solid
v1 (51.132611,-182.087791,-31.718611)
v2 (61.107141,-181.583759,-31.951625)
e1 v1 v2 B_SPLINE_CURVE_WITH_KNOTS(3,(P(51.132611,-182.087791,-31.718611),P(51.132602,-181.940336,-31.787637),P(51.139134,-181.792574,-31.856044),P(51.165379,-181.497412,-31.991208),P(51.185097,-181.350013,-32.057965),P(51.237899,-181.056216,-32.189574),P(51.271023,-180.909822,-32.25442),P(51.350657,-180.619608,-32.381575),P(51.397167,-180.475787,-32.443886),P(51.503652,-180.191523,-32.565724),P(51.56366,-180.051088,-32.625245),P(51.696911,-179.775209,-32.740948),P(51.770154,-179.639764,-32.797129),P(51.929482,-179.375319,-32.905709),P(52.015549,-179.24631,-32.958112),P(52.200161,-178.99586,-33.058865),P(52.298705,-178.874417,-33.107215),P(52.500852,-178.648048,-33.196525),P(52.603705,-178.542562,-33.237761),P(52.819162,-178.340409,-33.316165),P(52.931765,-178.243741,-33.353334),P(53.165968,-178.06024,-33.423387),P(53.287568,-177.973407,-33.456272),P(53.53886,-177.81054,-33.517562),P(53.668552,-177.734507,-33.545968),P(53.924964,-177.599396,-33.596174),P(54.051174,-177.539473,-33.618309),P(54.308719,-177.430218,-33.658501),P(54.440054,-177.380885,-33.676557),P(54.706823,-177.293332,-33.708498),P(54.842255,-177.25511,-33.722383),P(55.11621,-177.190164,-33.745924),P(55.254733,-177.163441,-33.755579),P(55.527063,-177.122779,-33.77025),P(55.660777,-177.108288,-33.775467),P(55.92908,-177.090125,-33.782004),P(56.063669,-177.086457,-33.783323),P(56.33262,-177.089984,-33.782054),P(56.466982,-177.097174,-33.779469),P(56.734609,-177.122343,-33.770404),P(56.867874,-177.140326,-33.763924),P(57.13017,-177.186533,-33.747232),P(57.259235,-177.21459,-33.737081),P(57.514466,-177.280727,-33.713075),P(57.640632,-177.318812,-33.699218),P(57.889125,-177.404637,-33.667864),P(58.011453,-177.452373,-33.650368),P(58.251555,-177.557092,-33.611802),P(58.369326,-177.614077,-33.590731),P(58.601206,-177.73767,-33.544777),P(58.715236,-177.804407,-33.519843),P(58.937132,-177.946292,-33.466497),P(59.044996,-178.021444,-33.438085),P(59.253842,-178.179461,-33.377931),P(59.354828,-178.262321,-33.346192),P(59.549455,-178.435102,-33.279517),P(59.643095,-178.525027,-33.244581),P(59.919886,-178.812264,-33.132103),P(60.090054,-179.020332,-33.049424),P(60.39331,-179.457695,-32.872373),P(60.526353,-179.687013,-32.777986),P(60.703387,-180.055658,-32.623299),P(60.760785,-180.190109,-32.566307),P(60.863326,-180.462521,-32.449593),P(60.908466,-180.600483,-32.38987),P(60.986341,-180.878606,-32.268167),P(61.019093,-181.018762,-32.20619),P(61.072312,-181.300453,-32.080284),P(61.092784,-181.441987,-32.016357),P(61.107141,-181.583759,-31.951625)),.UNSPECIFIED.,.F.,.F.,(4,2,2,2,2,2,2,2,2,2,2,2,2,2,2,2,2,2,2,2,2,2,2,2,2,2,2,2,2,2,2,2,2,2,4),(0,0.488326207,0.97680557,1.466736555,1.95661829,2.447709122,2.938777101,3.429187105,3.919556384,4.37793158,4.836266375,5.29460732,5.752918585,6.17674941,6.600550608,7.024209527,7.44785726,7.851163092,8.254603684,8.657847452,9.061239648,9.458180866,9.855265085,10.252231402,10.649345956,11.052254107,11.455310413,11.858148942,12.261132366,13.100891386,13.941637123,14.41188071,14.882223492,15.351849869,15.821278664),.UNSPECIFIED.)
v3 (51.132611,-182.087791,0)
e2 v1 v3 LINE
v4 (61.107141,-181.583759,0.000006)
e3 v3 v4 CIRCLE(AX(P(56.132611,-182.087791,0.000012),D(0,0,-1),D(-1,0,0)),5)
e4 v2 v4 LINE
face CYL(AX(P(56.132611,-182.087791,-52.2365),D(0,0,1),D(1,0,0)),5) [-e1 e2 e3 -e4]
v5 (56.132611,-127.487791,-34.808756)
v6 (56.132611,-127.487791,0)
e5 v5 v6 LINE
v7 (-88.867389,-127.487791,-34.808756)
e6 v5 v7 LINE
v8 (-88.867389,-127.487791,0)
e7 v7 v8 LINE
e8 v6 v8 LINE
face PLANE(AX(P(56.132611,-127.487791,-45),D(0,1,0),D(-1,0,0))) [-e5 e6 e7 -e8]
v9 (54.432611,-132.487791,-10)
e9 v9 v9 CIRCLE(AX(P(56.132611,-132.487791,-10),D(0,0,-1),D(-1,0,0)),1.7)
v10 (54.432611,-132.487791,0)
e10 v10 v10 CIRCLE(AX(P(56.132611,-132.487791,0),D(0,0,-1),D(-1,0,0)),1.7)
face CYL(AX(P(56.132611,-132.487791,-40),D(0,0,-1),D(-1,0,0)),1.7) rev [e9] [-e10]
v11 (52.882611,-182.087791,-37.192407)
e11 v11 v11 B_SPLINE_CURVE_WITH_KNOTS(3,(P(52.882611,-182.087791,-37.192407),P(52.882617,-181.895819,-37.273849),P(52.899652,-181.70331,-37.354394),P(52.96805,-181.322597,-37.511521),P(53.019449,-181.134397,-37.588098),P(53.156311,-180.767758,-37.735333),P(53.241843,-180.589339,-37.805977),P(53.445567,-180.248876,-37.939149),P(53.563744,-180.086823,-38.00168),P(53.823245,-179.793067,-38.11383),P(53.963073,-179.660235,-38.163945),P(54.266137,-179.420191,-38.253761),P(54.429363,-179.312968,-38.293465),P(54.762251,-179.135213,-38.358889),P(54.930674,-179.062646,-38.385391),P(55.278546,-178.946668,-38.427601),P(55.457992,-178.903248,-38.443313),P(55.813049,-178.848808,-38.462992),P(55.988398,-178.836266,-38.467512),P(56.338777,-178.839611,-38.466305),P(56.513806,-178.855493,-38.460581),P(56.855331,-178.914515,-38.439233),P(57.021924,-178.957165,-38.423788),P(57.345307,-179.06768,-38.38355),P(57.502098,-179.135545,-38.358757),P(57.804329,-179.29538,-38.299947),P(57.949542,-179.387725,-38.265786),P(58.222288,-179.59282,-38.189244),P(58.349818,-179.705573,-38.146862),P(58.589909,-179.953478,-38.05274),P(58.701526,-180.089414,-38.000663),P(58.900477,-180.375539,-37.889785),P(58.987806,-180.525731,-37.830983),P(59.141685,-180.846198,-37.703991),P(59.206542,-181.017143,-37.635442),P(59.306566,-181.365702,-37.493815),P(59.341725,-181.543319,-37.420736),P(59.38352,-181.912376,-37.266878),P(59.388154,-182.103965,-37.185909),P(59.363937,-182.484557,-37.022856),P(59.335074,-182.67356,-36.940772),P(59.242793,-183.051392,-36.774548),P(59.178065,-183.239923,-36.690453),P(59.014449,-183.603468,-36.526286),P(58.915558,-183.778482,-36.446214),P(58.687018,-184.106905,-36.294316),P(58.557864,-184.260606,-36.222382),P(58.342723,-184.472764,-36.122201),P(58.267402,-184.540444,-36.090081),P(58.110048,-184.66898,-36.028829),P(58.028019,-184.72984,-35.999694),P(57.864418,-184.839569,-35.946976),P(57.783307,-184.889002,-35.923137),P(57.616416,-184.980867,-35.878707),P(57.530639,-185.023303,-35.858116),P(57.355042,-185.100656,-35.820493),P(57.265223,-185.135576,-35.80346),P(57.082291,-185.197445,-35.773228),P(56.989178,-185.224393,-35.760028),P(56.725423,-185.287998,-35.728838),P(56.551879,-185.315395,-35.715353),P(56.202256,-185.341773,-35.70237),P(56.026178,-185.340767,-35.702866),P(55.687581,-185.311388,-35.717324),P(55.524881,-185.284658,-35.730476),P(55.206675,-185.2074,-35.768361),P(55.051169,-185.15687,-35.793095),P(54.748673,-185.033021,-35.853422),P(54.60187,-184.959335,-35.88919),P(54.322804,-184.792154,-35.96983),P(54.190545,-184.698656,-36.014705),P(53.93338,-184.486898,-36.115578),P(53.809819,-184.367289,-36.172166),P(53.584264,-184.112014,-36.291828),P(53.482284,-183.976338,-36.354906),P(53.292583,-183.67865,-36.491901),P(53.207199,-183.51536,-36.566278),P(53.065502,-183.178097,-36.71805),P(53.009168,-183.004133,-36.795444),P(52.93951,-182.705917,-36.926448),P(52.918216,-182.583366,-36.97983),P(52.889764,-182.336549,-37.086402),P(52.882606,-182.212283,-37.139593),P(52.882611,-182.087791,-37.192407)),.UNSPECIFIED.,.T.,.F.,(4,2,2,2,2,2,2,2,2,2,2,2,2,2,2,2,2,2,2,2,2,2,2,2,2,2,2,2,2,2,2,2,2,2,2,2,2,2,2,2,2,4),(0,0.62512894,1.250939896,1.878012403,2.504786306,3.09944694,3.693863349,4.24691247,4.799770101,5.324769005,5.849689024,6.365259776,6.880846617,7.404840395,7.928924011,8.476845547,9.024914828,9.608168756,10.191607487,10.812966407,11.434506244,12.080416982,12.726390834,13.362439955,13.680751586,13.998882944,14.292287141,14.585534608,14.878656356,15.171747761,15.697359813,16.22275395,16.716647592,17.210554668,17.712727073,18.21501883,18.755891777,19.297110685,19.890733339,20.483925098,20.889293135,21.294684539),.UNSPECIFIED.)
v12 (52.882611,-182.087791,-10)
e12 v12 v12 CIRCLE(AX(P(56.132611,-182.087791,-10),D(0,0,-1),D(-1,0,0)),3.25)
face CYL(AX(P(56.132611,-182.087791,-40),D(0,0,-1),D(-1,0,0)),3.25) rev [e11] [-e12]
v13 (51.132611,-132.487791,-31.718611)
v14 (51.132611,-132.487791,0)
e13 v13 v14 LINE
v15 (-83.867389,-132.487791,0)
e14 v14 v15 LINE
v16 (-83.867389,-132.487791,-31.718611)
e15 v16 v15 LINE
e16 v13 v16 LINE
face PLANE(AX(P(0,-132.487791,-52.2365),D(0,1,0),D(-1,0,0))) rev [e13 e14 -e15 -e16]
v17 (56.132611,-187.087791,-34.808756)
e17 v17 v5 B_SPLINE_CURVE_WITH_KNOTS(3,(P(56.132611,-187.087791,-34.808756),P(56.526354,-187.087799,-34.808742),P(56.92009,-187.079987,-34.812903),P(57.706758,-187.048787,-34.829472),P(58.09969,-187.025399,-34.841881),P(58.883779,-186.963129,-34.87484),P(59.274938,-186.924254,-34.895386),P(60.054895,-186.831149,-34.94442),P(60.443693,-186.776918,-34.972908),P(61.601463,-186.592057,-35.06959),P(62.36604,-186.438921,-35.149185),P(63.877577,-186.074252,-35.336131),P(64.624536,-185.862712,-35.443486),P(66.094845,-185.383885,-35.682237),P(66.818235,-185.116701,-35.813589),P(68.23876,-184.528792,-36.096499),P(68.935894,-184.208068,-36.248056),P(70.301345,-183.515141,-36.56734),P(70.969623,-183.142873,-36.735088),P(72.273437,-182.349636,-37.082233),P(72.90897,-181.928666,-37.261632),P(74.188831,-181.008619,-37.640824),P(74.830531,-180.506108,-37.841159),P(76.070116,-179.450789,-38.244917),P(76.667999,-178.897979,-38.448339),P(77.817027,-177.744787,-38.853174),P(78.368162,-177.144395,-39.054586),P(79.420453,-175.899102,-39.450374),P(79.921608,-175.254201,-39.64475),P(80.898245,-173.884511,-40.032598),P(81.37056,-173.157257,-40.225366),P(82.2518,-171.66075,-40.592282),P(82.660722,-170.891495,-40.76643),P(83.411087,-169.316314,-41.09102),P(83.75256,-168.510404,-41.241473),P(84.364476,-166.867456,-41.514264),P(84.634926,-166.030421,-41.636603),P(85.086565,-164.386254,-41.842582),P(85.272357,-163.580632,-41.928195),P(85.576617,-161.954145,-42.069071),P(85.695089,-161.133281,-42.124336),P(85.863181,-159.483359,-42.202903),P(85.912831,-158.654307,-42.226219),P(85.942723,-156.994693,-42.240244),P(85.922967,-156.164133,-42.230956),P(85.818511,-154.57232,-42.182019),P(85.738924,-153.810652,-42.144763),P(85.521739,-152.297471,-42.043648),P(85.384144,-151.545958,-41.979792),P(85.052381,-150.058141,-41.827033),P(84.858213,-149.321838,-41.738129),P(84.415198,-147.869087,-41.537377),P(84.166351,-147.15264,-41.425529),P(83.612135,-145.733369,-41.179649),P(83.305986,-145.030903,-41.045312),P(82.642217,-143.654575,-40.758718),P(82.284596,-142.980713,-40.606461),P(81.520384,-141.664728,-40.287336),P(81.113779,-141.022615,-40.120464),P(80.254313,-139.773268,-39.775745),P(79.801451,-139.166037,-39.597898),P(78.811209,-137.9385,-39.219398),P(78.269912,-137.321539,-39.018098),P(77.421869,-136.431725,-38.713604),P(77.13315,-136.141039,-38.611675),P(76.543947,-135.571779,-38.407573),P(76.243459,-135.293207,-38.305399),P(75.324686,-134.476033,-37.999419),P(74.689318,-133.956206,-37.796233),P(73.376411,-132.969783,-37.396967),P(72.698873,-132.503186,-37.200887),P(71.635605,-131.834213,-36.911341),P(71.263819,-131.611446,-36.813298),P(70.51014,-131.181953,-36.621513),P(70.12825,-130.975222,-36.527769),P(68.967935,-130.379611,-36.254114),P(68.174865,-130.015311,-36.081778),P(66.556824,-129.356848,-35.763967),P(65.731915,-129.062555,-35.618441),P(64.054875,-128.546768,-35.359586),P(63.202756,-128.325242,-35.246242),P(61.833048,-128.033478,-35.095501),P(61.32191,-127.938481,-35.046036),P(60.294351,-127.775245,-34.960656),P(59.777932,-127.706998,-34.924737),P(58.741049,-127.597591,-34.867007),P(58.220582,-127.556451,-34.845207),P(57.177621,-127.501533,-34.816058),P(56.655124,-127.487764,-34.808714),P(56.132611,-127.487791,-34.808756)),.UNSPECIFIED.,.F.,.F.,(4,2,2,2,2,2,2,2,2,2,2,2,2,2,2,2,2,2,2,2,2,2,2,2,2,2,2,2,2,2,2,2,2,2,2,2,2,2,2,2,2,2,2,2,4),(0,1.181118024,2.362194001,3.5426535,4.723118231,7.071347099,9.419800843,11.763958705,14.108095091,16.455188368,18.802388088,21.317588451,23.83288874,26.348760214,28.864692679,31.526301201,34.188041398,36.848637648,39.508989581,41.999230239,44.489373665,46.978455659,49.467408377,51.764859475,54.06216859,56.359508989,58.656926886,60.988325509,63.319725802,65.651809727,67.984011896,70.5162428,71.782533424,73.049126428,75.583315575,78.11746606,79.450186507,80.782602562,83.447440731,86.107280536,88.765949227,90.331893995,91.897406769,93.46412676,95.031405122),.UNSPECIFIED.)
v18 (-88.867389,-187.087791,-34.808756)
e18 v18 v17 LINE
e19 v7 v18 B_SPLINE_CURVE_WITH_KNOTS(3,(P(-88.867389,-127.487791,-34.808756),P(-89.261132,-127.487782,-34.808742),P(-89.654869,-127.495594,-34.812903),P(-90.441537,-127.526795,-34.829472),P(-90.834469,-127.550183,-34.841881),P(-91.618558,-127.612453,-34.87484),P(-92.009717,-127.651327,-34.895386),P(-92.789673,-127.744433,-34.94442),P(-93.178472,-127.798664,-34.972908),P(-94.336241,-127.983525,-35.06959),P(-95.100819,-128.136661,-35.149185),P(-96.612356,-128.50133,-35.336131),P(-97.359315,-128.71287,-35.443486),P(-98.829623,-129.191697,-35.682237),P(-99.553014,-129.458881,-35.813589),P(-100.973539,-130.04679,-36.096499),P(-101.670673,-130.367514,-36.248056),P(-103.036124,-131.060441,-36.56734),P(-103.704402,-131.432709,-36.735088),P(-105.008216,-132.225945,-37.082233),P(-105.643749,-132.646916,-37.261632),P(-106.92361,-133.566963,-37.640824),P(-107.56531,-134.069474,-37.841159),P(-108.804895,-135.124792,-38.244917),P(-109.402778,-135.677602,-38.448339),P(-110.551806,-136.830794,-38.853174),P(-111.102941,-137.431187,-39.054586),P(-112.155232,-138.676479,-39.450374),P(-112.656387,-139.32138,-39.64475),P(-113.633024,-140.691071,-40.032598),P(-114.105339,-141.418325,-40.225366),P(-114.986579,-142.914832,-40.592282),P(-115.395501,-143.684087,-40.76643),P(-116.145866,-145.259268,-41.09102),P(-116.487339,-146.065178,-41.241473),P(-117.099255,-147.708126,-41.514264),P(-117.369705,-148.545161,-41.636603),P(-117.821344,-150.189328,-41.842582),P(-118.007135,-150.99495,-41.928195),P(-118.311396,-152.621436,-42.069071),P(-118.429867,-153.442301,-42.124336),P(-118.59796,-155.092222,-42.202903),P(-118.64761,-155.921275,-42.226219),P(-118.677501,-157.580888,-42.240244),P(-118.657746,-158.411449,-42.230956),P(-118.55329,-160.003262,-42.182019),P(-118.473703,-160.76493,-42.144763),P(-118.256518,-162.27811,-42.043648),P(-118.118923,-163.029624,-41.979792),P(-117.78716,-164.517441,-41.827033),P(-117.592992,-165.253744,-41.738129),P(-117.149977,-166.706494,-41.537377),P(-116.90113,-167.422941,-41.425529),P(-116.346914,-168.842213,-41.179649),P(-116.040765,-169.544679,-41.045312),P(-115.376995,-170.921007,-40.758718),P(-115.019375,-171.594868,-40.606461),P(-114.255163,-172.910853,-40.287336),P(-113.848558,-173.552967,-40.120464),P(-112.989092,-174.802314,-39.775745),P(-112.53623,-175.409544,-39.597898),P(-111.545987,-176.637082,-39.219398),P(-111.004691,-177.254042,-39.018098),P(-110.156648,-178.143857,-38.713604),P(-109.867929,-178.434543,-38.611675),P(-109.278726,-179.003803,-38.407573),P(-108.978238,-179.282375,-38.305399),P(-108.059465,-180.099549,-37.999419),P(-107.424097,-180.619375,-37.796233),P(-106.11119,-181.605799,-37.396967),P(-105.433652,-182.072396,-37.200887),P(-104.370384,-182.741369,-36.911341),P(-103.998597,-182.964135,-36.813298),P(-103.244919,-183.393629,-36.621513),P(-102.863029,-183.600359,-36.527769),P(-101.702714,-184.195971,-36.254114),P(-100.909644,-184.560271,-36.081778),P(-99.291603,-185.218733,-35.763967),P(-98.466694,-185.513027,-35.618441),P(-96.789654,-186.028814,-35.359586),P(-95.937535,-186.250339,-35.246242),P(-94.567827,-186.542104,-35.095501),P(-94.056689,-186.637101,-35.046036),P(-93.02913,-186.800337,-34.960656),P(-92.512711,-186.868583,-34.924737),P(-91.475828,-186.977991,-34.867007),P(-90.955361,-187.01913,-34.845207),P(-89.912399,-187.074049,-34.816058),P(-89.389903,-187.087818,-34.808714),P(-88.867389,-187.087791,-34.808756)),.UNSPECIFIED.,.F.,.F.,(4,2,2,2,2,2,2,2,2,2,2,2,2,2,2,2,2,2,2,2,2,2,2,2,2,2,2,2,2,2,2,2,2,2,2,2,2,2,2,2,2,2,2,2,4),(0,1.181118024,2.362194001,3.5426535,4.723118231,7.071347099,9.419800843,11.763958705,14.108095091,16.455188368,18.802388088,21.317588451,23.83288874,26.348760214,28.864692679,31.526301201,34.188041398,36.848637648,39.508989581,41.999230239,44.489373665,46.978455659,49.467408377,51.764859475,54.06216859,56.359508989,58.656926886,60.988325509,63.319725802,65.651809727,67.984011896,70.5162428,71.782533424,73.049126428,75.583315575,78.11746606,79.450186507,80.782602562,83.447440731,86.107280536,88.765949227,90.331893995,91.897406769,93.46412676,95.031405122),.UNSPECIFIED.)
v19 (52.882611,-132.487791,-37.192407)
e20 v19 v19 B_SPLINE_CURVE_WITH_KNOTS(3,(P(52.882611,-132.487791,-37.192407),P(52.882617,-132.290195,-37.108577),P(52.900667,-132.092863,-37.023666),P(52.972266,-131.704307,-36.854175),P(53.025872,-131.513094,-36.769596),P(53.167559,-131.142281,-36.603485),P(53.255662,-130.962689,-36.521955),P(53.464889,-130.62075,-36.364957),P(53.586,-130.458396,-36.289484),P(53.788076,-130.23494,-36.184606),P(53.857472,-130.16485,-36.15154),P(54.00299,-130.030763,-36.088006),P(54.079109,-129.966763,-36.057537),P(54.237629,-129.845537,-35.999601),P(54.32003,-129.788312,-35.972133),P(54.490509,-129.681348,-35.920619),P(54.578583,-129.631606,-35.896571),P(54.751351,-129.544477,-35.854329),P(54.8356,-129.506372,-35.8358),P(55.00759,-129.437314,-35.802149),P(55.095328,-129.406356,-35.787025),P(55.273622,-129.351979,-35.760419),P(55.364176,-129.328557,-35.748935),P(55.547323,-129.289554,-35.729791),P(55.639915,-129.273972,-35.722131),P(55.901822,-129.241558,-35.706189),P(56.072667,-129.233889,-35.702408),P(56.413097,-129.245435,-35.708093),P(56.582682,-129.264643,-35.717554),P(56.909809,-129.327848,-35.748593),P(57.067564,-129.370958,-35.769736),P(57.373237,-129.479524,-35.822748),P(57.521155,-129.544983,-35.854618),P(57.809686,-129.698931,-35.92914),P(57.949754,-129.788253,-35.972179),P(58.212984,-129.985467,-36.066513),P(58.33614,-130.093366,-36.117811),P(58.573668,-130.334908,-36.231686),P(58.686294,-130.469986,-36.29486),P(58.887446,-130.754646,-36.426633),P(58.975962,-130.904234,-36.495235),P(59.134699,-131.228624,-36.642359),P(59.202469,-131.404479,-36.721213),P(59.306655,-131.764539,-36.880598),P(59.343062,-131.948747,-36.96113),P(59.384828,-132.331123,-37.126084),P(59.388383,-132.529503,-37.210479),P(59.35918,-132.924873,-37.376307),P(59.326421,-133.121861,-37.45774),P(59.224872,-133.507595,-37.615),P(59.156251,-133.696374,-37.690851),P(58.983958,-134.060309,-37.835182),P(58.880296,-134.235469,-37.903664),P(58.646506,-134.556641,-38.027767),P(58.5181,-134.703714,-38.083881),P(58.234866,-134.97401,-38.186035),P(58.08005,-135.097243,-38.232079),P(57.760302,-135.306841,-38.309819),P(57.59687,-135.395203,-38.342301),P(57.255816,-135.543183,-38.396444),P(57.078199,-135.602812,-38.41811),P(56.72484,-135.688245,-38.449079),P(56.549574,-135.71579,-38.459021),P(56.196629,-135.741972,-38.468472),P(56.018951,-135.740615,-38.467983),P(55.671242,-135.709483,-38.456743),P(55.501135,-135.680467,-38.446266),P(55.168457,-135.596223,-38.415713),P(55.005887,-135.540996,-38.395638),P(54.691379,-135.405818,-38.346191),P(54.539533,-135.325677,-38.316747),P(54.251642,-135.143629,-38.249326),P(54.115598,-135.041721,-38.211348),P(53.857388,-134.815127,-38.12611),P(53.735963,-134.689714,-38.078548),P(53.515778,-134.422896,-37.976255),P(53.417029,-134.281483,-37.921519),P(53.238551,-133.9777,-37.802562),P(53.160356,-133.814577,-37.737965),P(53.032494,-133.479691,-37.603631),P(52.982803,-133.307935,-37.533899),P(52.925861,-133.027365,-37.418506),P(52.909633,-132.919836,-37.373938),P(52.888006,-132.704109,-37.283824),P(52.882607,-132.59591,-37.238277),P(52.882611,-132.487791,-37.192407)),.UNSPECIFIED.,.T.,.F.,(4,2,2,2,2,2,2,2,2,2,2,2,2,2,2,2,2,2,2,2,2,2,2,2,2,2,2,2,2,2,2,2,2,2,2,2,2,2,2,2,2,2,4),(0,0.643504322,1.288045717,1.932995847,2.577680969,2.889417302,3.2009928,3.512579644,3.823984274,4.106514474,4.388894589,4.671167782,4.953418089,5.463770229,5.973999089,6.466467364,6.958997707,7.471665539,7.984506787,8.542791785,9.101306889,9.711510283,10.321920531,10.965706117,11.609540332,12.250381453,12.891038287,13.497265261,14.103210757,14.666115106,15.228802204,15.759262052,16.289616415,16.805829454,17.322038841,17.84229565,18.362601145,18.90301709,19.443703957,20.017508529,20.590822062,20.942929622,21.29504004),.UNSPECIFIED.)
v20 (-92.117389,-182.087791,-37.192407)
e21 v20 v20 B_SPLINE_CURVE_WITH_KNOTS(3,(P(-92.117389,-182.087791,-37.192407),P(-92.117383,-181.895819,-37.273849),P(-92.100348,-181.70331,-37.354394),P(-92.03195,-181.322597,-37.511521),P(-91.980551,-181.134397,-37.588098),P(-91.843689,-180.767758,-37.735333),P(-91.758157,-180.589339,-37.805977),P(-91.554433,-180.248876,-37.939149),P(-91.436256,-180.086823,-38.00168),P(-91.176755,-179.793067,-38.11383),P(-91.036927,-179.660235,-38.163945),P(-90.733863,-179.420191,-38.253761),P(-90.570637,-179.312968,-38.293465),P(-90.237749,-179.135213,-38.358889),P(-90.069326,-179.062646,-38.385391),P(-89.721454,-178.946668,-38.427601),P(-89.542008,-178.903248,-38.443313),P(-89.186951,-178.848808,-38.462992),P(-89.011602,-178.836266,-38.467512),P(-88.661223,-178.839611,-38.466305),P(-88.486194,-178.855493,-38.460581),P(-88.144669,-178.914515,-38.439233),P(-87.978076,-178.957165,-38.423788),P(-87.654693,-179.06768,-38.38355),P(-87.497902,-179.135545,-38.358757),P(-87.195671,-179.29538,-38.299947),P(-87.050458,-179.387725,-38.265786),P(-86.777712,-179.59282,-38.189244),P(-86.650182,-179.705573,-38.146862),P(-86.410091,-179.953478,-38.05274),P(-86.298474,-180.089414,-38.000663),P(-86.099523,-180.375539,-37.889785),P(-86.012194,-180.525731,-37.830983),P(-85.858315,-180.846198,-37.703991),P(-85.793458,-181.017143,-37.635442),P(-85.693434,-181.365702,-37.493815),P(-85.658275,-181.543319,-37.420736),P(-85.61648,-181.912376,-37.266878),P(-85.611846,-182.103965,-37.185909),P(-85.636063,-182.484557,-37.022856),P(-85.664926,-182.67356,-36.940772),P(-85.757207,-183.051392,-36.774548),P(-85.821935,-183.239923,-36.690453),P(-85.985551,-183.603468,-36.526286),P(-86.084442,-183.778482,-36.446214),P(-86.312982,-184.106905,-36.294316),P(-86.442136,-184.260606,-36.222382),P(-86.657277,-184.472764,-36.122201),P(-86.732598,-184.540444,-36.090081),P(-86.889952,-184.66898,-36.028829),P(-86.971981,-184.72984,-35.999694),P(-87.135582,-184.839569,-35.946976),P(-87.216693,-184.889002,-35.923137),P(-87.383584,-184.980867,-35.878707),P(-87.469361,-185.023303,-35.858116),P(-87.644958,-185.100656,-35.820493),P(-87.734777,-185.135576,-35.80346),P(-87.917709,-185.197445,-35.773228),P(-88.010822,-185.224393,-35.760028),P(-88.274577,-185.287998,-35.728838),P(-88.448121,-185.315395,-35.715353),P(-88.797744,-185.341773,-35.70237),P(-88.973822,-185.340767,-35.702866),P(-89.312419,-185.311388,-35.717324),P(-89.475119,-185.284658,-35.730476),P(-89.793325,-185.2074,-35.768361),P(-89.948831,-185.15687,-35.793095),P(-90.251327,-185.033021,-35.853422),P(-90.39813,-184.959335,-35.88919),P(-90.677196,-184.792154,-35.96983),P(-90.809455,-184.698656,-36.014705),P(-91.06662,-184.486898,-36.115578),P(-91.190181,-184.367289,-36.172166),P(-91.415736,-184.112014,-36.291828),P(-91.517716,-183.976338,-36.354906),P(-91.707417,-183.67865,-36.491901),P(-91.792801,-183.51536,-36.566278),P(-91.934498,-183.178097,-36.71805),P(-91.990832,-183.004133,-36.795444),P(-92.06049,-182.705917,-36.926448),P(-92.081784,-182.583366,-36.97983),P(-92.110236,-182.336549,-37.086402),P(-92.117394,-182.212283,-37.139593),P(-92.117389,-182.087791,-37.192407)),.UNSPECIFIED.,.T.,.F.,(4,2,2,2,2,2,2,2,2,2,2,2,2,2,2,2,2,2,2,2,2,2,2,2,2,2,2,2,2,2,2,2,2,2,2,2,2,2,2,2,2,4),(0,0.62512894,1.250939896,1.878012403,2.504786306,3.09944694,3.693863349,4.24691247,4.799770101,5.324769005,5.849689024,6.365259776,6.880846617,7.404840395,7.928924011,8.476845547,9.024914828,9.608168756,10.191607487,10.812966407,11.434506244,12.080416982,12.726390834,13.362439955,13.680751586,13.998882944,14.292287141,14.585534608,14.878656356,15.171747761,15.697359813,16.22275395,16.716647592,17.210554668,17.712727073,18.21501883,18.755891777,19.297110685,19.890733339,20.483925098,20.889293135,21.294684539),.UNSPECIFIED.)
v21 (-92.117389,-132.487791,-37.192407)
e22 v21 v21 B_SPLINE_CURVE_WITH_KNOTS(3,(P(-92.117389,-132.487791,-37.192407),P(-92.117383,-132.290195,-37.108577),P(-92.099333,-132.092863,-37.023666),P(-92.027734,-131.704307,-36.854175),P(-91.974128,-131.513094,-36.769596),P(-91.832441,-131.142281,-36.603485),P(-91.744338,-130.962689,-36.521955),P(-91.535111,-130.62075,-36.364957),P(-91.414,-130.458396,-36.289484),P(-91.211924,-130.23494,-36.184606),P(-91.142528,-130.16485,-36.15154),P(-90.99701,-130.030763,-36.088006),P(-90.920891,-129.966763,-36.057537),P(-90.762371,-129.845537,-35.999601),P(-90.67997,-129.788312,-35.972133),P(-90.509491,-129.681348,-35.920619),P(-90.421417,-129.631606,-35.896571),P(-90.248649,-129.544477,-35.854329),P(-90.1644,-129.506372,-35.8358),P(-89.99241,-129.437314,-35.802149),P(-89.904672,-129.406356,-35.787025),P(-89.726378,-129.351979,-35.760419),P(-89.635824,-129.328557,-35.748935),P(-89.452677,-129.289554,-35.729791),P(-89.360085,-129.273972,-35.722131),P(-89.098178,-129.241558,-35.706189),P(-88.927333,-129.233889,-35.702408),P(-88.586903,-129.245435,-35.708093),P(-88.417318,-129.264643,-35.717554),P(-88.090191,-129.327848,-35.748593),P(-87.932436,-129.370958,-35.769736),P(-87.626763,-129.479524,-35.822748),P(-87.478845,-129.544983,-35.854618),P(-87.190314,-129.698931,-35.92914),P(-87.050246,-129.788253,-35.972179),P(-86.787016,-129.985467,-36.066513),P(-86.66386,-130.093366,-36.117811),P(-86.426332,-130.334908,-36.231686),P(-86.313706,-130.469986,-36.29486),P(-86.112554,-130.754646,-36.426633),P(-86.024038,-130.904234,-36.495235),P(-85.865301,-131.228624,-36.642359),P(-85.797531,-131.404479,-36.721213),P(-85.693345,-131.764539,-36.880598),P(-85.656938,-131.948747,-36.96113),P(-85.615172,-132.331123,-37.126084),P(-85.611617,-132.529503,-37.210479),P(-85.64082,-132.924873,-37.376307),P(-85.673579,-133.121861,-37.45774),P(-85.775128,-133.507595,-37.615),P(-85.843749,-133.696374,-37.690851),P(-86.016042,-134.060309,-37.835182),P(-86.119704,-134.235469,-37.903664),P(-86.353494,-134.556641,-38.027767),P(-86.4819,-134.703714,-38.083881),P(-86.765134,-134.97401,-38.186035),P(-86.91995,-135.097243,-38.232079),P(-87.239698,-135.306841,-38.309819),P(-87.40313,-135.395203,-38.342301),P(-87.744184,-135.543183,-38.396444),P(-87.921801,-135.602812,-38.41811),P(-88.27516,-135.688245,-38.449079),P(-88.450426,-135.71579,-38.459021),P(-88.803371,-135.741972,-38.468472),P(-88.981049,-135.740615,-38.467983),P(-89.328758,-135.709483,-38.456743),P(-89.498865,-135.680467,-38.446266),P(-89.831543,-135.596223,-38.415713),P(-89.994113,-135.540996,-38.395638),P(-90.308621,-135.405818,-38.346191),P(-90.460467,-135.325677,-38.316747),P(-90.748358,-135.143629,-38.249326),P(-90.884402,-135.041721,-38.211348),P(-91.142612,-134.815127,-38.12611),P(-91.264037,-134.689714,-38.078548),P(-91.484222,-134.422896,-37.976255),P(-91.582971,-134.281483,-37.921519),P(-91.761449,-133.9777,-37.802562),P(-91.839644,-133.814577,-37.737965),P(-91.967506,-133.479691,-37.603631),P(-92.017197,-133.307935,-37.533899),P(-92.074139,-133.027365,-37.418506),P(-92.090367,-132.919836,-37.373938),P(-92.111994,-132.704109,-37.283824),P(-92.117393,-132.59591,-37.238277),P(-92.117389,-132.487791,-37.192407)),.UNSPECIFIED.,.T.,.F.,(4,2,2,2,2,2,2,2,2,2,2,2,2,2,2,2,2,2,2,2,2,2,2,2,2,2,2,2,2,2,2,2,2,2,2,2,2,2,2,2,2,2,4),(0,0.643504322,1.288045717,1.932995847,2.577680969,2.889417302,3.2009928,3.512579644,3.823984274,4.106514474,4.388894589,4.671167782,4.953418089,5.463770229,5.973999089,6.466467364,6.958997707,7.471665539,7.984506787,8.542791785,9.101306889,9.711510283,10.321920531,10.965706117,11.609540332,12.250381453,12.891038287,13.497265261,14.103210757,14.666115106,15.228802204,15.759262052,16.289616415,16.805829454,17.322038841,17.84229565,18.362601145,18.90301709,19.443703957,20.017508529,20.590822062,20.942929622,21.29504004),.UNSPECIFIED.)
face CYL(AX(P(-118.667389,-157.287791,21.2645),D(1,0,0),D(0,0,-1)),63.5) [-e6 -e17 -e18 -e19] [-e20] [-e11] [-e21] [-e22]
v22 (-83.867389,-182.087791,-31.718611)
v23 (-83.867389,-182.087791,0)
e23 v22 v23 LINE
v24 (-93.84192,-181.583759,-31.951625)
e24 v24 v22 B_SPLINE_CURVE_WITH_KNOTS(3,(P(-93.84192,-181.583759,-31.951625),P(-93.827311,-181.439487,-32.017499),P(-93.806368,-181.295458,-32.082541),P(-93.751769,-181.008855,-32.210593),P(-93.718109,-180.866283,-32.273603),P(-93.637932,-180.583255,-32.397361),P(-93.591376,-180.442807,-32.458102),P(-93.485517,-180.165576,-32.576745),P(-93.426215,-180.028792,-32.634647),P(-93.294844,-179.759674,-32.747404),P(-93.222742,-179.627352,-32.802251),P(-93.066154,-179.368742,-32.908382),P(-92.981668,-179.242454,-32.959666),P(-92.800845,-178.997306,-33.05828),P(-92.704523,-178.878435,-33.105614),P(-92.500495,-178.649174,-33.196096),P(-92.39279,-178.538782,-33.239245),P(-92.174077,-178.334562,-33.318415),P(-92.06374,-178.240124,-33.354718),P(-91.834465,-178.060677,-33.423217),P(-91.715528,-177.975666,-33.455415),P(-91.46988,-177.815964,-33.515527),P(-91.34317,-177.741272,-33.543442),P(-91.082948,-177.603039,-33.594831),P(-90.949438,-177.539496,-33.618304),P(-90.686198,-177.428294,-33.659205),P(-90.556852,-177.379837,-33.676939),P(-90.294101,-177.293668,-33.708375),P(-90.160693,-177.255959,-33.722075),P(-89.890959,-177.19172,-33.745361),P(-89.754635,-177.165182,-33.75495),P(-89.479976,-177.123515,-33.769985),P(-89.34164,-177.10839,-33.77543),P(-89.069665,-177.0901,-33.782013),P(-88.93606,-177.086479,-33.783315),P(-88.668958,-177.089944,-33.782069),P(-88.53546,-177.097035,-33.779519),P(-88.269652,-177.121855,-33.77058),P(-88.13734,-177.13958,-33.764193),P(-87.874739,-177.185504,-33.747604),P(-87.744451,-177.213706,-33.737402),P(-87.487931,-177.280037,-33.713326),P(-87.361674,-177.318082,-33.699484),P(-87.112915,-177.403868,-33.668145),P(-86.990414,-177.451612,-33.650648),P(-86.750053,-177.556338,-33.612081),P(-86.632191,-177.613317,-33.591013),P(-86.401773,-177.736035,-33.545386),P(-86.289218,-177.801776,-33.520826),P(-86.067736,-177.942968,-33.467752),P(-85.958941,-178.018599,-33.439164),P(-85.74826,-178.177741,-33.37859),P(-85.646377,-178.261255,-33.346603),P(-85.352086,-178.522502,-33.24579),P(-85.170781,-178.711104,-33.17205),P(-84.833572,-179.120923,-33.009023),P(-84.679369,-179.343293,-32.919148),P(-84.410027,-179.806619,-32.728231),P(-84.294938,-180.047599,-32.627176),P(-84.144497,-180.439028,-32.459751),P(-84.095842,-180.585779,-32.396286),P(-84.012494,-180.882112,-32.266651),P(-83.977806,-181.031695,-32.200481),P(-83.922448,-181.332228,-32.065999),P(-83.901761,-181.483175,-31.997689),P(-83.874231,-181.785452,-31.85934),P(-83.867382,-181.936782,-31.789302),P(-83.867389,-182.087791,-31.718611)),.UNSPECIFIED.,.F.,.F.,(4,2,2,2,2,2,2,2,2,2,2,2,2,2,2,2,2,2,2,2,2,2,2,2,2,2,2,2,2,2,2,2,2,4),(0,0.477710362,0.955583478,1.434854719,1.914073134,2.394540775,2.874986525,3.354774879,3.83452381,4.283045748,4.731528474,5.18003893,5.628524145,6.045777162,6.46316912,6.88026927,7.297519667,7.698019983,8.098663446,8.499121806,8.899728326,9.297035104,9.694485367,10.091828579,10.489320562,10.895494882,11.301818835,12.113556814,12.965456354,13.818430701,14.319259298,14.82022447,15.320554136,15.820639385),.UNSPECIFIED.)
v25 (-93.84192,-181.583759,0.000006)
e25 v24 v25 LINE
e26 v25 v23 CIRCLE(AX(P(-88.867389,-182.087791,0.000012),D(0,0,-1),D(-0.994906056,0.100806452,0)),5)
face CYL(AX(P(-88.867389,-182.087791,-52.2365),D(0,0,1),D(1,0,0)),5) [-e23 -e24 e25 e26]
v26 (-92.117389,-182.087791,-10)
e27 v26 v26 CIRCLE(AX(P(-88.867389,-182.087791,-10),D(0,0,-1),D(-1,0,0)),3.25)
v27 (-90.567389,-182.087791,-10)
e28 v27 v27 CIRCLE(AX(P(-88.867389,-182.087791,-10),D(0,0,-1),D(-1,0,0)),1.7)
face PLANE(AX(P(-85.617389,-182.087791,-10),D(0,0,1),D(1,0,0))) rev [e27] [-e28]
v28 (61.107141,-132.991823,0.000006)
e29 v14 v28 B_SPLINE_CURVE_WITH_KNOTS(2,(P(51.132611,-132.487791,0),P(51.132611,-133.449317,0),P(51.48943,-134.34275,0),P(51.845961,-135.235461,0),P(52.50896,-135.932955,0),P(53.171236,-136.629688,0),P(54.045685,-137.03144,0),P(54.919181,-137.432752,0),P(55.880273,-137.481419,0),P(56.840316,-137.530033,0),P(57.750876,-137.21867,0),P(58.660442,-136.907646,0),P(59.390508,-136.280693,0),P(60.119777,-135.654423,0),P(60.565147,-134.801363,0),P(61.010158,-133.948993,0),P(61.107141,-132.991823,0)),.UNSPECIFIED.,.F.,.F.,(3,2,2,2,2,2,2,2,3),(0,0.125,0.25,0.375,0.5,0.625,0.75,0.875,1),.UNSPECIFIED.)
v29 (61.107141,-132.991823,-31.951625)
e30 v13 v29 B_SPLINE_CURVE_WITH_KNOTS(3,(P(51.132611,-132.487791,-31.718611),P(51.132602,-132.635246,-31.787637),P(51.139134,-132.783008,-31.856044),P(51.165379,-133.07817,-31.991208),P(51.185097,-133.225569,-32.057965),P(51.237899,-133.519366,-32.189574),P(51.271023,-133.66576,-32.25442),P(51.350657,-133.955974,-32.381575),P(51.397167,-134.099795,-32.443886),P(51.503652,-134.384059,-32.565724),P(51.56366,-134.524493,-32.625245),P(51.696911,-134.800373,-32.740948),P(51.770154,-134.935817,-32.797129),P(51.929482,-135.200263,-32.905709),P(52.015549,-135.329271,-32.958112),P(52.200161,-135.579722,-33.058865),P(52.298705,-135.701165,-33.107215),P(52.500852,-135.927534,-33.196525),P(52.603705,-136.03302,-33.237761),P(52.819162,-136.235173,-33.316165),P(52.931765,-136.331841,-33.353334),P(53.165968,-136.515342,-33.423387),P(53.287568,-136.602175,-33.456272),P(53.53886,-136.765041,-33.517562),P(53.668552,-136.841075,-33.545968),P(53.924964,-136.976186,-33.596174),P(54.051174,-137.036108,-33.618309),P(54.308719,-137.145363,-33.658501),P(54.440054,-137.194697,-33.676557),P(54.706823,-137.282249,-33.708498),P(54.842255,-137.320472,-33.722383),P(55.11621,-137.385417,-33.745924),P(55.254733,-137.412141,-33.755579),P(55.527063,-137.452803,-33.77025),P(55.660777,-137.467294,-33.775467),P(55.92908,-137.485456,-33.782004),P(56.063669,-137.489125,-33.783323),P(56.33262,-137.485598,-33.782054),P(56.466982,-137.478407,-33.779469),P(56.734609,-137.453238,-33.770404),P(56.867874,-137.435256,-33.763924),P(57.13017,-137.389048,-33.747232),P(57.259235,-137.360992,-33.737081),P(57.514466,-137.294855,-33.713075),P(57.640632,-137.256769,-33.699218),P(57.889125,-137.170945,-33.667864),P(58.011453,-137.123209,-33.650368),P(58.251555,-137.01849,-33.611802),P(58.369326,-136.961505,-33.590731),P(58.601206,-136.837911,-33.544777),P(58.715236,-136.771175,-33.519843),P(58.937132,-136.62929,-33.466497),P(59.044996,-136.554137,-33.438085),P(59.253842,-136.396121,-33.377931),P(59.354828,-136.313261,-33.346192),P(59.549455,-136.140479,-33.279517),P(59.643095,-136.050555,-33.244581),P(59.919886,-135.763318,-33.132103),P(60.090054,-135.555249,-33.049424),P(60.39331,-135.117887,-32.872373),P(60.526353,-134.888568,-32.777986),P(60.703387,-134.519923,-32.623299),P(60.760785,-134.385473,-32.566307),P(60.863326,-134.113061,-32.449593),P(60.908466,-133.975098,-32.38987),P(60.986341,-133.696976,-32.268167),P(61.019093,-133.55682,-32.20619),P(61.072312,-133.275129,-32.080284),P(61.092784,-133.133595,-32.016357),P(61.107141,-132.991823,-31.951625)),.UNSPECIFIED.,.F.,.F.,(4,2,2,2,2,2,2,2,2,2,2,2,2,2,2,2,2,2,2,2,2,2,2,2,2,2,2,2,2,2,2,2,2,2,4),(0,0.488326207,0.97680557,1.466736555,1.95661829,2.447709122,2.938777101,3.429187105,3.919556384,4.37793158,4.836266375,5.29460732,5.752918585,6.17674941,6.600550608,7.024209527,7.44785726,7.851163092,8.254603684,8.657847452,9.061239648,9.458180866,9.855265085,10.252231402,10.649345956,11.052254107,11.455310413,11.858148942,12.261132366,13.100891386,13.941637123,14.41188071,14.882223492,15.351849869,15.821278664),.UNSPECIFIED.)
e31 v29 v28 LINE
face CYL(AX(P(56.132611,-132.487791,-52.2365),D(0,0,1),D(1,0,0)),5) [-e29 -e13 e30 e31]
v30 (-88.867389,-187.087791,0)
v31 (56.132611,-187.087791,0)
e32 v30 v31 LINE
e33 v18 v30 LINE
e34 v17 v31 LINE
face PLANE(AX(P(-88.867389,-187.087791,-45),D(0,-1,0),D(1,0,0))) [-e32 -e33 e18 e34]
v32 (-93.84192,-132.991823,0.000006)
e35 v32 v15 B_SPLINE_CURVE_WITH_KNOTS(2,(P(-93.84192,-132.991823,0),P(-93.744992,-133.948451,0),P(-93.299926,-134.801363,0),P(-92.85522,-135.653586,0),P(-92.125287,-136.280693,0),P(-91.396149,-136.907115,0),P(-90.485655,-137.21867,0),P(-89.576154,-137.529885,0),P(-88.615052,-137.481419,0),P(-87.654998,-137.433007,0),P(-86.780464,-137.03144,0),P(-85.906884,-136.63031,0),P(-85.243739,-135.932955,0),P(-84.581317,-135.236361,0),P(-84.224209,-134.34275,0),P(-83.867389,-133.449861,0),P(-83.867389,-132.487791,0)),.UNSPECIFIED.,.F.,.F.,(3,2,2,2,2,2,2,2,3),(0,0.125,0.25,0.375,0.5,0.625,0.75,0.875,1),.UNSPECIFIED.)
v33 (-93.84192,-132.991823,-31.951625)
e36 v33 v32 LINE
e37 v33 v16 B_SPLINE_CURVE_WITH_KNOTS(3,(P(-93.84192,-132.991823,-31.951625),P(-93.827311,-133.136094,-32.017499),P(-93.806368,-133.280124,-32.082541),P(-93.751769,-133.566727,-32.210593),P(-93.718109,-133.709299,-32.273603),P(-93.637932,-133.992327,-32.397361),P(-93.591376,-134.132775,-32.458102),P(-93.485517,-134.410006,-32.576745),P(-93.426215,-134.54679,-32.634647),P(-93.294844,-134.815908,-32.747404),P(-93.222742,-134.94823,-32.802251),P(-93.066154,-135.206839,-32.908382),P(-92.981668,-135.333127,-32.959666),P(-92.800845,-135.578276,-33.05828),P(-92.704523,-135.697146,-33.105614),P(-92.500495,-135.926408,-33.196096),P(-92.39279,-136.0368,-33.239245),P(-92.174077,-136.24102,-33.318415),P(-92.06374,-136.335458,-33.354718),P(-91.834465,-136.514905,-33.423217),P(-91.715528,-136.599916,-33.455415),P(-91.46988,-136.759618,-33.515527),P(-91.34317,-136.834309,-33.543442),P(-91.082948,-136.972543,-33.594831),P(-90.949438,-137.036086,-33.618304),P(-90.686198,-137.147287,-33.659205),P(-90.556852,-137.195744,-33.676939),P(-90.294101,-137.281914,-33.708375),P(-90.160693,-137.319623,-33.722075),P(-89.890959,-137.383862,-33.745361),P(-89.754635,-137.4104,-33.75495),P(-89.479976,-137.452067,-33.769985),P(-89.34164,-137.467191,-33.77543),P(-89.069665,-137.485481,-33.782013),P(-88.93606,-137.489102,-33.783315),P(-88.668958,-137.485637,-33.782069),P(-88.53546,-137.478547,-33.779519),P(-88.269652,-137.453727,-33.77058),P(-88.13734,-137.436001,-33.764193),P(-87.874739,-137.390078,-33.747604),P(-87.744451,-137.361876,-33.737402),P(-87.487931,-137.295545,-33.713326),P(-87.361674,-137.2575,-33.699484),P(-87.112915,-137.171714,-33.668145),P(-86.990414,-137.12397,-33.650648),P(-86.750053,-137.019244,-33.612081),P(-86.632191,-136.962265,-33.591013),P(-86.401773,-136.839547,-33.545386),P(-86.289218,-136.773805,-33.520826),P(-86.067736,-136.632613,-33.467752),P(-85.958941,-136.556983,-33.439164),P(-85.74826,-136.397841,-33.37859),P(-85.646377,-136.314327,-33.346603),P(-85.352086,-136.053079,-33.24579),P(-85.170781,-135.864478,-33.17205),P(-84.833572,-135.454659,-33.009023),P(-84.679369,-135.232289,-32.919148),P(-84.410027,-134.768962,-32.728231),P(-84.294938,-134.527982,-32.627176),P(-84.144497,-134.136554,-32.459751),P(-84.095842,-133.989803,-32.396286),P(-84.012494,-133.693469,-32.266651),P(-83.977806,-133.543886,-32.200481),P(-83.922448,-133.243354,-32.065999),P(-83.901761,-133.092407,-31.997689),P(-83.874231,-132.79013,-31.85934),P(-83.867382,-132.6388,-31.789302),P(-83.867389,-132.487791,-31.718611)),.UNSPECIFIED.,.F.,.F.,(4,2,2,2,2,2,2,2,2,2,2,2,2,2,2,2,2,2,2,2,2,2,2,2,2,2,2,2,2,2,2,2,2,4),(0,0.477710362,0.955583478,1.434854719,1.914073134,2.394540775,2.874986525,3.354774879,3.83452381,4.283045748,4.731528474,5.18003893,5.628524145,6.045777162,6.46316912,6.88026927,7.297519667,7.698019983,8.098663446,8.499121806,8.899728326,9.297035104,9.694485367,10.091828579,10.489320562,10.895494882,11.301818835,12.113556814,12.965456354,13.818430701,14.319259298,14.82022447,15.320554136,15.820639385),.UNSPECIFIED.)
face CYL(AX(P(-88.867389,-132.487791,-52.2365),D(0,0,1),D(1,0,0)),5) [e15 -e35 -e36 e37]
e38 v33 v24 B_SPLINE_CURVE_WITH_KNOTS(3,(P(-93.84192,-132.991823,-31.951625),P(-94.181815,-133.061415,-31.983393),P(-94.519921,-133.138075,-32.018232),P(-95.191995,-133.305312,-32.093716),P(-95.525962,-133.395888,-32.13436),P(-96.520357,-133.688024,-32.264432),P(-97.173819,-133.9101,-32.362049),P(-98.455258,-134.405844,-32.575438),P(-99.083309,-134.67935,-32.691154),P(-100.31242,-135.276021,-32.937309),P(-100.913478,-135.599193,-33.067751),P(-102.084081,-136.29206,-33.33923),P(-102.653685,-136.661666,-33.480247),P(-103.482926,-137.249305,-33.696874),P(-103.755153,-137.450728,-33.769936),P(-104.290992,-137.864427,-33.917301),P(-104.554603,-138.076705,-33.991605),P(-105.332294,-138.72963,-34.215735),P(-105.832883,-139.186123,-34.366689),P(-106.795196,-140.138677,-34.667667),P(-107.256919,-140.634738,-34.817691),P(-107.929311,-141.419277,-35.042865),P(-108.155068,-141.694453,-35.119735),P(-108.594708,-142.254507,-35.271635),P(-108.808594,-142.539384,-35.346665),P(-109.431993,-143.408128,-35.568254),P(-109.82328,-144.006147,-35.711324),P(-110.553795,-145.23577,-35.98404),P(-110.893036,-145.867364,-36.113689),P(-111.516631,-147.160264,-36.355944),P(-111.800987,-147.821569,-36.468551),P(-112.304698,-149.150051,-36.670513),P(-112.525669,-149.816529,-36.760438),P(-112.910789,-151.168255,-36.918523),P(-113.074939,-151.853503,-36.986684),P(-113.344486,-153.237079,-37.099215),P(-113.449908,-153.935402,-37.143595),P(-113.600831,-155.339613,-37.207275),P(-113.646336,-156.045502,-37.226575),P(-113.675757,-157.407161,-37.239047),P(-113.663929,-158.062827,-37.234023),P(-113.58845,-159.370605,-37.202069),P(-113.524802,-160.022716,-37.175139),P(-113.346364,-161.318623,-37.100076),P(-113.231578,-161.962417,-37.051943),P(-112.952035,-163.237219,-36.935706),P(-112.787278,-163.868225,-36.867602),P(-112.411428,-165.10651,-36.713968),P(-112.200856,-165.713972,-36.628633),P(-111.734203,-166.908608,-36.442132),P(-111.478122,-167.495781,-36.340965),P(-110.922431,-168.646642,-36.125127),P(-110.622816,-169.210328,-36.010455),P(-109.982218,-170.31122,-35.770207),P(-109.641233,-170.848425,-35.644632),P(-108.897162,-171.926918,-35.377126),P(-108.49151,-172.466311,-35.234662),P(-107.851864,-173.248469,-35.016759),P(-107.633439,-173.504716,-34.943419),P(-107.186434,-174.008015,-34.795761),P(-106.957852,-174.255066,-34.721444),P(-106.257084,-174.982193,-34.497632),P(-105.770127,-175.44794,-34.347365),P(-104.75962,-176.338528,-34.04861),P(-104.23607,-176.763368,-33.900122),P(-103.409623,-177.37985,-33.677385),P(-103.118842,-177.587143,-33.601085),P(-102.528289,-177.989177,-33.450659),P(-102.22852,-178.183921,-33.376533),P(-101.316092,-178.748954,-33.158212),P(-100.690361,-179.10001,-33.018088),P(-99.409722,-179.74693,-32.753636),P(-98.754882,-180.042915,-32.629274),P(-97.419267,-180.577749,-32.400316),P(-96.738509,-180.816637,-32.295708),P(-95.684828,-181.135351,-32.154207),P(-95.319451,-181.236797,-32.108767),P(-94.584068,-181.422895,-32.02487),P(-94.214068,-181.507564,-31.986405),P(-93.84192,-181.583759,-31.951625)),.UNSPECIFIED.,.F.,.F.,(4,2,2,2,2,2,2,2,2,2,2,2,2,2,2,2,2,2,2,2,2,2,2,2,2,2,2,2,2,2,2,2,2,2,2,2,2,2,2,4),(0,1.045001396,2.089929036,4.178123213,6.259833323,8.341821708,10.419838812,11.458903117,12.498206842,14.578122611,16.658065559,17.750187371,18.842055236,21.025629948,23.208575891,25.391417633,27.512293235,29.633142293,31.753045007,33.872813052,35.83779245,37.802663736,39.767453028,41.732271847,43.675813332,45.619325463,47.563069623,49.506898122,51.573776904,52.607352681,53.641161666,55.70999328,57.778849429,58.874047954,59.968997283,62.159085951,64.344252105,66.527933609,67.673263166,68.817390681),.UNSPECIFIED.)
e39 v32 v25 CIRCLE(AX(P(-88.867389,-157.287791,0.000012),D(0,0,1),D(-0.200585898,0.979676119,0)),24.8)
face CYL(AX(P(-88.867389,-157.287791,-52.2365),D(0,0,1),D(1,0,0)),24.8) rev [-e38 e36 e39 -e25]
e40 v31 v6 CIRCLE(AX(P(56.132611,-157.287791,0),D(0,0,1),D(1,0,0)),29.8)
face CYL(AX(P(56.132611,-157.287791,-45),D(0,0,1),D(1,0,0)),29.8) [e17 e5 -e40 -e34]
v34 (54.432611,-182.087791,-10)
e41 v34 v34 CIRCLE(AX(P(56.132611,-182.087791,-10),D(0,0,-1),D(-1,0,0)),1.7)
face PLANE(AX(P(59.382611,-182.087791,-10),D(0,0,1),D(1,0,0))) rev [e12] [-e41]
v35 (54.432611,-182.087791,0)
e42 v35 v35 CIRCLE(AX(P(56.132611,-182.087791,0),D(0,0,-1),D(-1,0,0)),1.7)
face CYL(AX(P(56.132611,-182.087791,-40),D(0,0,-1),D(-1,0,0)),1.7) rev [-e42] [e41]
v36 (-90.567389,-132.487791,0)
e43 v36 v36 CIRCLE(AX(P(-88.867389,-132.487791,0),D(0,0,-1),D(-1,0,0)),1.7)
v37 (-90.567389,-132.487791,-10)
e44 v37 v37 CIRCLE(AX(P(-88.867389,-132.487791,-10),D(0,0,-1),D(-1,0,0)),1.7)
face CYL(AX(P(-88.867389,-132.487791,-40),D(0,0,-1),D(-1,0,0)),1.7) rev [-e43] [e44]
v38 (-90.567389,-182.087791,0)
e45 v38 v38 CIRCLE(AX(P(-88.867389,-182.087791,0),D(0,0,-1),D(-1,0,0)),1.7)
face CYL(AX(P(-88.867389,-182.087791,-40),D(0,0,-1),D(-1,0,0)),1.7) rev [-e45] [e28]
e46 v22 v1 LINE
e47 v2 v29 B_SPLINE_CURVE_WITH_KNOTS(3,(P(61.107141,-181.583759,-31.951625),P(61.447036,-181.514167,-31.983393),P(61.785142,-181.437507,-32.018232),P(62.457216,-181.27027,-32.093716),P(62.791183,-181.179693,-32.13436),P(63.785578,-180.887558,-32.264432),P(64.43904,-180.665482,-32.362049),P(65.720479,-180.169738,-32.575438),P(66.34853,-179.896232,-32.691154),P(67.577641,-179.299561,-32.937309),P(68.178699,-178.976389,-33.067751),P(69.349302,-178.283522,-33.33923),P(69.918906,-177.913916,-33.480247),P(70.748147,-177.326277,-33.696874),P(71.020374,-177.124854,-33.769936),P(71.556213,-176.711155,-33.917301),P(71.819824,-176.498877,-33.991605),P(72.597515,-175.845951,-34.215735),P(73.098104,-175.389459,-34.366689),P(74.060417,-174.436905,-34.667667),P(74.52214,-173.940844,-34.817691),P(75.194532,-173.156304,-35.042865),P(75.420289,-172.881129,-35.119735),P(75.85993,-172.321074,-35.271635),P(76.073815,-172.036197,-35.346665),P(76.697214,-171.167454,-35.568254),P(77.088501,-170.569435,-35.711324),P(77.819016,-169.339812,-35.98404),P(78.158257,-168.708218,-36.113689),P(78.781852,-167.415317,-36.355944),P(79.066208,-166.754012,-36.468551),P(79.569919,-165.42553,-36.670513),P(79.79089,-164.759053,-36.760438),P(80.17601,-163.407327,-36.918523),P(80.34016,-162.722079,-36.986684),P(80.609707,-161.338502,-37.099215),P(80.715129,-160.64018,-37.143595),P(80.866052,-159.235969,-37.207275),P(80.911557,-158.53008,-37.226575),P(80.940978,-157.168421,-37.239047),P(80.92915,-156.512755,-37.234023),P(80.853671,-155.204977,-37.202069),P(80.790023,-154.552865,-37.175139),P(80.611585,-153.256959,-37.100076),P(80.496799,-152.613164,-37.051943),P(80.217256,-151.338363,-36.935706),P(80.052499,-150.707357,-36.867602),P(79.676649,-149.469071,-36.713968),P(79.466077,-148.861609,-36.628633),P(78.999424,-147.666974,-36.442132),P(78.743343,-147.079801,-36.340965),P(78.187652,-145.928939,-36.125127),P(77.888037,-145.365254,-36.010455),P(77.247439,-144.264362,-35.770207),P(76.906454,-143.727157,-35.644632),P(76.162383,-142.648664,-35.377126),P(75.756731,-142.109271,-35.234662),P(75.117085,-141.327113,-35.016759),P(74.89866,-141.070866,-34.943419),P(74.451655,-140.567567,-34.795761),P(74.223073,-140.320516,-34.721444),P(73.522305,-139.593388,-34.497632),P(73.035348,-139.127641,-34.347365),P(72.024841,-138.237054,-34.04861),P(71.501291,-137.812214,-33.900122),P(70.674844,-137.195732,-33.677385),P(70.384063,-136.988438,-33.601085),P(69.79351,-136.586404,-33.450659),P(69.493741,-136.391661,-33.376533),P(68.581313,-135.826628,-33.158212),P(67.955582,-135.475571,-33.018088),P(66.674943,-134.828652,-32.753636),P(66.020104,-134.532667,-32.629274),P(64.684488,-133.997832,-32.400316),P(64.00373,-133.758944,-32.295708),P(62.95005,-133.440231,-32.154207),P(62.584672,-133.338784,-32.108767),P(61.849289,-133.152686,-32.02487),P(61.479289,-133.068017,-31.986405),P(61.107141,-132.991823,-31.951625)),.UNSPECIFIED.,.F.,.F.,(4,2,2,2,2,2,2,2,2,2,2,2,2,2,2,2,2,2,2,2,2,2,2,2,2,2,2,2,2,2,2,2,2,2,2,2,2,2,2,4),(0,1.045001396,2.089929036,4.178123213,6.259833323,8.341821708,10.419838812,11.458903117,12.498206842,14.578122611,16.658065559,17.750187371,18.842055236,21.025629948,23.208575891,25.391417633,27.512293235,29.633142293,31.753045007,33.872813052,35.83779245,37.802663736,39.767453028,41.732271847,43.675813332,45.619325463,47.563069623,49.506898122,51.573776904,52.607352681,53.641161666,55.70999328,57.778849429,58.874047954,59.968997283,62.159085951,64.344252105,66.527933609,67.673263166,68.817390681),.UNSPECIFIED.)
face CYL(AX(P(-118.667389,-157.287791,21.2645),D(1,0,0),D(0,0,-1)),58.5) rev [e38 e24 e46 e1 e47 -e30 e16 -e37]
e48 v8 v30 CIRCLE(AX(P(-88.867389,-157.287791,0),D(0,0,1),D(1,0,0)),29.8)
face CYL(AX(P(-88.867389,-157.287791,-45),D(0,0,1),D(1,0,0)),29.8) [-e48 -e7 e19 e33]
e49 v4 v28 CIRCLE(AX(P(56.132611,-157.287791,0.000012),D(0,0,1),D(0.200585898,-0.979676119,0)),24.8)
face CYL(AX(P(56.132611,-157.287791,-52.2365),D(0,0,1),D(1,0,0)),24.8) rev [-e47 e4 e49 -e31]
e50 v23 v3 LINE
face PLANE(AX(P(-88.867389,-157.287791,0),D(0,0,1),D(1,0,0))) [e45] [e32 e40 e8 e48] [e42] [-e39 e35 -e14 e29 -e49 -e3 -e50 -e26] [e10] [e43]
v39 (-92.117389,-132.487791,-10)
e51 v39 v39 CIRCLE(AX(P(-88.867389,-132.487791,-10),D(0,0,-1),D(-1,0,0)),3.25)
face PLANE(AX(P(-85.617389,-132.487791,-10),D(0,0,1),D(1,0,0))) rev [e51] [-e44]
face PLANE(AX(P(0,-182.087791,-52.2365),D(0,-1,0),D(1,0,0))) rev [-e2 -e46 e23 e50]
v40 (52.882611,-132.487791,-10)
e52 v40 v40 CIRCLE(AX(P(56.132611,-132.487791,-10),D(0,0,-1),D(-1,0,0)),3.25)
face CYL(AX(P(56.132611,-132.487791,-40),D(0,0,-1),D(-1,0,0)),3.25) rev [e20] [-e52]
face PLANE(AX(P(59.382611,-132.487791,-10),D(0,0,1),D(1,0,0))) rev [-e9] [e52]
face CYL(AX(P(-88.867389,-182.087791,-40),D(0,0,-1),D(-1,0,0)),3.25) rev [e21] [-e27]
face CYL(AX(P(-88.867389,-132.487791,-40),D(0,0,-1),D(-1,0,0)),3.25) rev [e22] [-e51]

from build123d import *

# Parameters (mm, degrees)
BOSS_EXTRUDE2_DEPTH                          = 45
CUT_EXTRUDE1_START                           = -120
CUT_EXTRUDE1_DEPTH                           = 207
CBORE_FOR_M3_HEX_SOCKET_HEAD_CAP_SCR_2_COUNT = 2
CBORE_FOR_M3_HEX_SOCKET_HEAD_CAP_SCR_2_PITCH = 145
CBORE_FOR_M3_HEX_SOCKET_HEAD_CAP_SCR_3_COUNT = 2
CBORE_FOR_M3_HEX_SOCKET_HEAD_CAP_SCR_3_PITCH = 153.248686781
CBORE_FOR_M3_HEX_SOCKET_HEAD_CAP_SCR_4_COUNT = 2
CBORE_FOR_M3_HEX_SOCKET_HEAD_CAP_SCR_4_PITCH = 49.6
CUT_EXTRUDE2_REACH                           = 227.539
CUT_EXTRUDE2_END_RADIUS                      = 58.5
CUT_EXTRUDE2_DIRECTION_2_DEPTH               = 226.538529612


with BuildPart() as part:
    # Sketch2 → Boss-Extrude2 (new body)
    with BuildSketch(Plane.XY):
        with BuildLine():
            Line((56.132610552, -127.487790866), (-88.867389448, -127.487790866))
            ThreePointArc((-88.867389448, -127.487790866), (-118.667389448, -157.287790866), (-88.867389448, -187.087790866))
            Line((-88.867389448, -187.087790866), (56.132610552, -187.087790866))
            ThreePointArc((56.132610552, -187.087790866), (85.932610552, -157.287790866), (56.132610552, -127.487790866))
        make_face()
    extrude(amount=-BOSS_EXTRUDE2_DEPTH)

    # Cut-Extrude1: read off the stored shape, not the designer's step
    # Cut-Extrude1 outline → Cut-Extrude1 (cut)
    with BuildSketch(Plane(origin=(0, 0, 0), x_dir=(0, 0, -1), z_dir=(1, 0, 0)).offset(CUT_EXTRUDE1_START)):
        with BuildLine():
            ThreePointArc((34.808748648, -127.487777676), (42.2355, -157.287790865), (34.808748648, -187.087804055))
            Line((34.808748648, -187.087804055), (45, -187.087790866))
            Line((45, -187.087790866), (45, -127.487790866))
            Line((45, -127.487790866), (34.808748648, -127.487777676))
        make_face()
    extrude(amount=CUT_EXTRUDE1_DEPTH, mode=Mode.SUBTRACT)

    # Sketch6 → CBORE for M3 Hex Socket Head Cap Screw1 (revolve, cut)
    with BuildSketch(Plane(origin=(56.132610552, -132.487790866, -40), x_dir=(0, 1, 0), z_dir=(1, 0, 0))):
        Polygon((0, 0), (0, 40), (1.7, 40), (1.7, 30), (3.25, 30), (3.25, 0.025), (3.275, 0), align=None)
    cbore_for_m3_hex_socket_head_cap_screw1 = revolve(axis=Axis((56.132610552, -132.487790866, -46.35), (0, 0, 1)), mode=Mode.SUBTRACT)

    # CBORE for M3 Hex Socket Head Cap Scr 2: CBORE for M3 Hex Socket Head Cap Screw1 ×2
    with Locations(*[(-i * CBORE_FOR_M3_HEX_SOCKET_HEAD_CAP_SCR_2_PITCH, 0, 0) for i in range(1, CBORE_FOR_M3_HEX_SOCKET_HEAD_CAP_SCR_2_COUNT)]):
        add(cbore_for_m3_hex_socket_head_cap_screw1, mode=Mode.SUBTRACT)

    # CBORE for M3 Hex Socket Head Cap Scr 3: CBORE for M3 Hex Socket Head Cap Screw1 ×2
    with Locations(*[Vector(-0.9461745026730805, -0.32365693332809825, 0) * (i * CBORE_FOR_M3_HEX_SOCKET_HEAD_CAP_SCR_3_PITCH) for i in range(1, CBORE_FOR_M3_HEX_SOCKET_HEAD_CAP_SCR_3_COUNT)]):
        add(cbore_for_m3_hex_socket_head_cap_screw1, mode=Mode.SUBTRACT)

    # CBORE for M3 Hex Socket Head Cap Scr 4: CBORE for M3 Hex Socket Head Cap Screw1 ×2
    with Locations(*[(0, -i * CBORE_FOR_M3_HEX_SOCKET_HEAD_CAP_SCR_4_PITCH, 0) for i in range(1, CBORE_FOR_M3_HEX_SOCKET_HEAD_CAP_SCR_4_COUNT)]):
        add(cbore_for_m3_hex_socket_head_cap_screw1, mode=Mode.SUBTRACT)

    # Cut-Extrude2: up to this cylinder (the profile starts inside it)
    cut_extrude2_end = Plane(origin=(-16.367389, -157.287790866, 21.2645), z_dir=(1, 0, 0)) * Cylinder(CUT_EXTRUDE2_END_RADIUS, 573.078, mode=Mode.PRIVATE)
    # Sketch7 → Cut-Extrude2 (cut, up to the surface)
    with BuildSketch(Plane.XY, mode=Mode.PRIVATE) as cut_extrude2_sk1:
        with BuildLine():
            ThreePointArc((-93.841919726, -181.583758608), (-88.615051766, -177.094162356), (-83.867389448, -182.087790866))
            Line((-83.867389448, -182.087790866), (51.132610552, -182.087790866))
            ThreePointArc((51.132610552, -182.087790866), (55.88027287, -177.094162356), (61.10714083, -181.583758608))
            ThreePointArc((61.10714083, -181.583758608), (80.932610552, -157.287790866), (61.10714083, -132.991823124))
            ThreePointArc((61.10714083, -132.991823124), (55.88027287, -137.481419376), (51.132610552, -132.487790866))
            Line((51.132610552, -132.487790866), (-83.867389448, -132.487790866))
            ThreePointArc((-83.867389448, -132.487790866), (-88.615051766, -137.481419376), (-93.841919726, -132.991823124))
            ThreePointArc((-93.841919726, -132.991823124), (-113.667389448, -157.287790866), (-93.841919726, -181.583758608))
        make_face()
    cut_extrude2_tool1 = extrude(cut_extrude2_sk1.sketch, amount=-CUT_EXTRUDE2_REACH, mode=Mode.PRIVATE) & cut_extrude2_end
    add(cut_extrude2_tool1.solids().sort_by_distance((-16.367389, -157.287791, 0))[0], mode=Mode.SUBTRACT)

    # Sketch7 → Cut-Extrude2 direction 2 (cut)
    with BuildSketch(Plane.XY):
        with BuildLine():
            ThreePointArc((-93.841919726, -181.583758608), (-88.615051766, -177.094162356), (-83.867389448, -182.087790866))
            Line((-83.867389448, -182.087790866), (51.132610552, -182.087790866))
            ThreePointArc((51.132610552, -182.087790866), (55.88027287, -177.094162356), (61.10714083, -181.583758608))
            ThreePointArc((61.10714083, -181.583758608), (80.932610552, -157.287790866), (61.10714083, -132.991823124))
            ThreePointArc((61.10714083, -132.991823124), (55.88027287, -137.481419376), (51.132610552, -132.487790866))
            Line((51.132610552, -132.487790866), (-83.867389448, -132.487790866))
            ThreePointArc((-83.867389448, -132.487790866), (-88.615051766, -137.481419376), (-93.841919726, -132.991823124))
            ThreePointArc((-93.841919726, -132.991823124), (-113.667389448, -157.287790866), (-93.841919726, -181.583758608))
        make_face()
    extrude(amount=CUT_EXTRUDE2_DIRECTION_2_DEPTH, mode=Mode.SUBTRACT)


solid = part.part
